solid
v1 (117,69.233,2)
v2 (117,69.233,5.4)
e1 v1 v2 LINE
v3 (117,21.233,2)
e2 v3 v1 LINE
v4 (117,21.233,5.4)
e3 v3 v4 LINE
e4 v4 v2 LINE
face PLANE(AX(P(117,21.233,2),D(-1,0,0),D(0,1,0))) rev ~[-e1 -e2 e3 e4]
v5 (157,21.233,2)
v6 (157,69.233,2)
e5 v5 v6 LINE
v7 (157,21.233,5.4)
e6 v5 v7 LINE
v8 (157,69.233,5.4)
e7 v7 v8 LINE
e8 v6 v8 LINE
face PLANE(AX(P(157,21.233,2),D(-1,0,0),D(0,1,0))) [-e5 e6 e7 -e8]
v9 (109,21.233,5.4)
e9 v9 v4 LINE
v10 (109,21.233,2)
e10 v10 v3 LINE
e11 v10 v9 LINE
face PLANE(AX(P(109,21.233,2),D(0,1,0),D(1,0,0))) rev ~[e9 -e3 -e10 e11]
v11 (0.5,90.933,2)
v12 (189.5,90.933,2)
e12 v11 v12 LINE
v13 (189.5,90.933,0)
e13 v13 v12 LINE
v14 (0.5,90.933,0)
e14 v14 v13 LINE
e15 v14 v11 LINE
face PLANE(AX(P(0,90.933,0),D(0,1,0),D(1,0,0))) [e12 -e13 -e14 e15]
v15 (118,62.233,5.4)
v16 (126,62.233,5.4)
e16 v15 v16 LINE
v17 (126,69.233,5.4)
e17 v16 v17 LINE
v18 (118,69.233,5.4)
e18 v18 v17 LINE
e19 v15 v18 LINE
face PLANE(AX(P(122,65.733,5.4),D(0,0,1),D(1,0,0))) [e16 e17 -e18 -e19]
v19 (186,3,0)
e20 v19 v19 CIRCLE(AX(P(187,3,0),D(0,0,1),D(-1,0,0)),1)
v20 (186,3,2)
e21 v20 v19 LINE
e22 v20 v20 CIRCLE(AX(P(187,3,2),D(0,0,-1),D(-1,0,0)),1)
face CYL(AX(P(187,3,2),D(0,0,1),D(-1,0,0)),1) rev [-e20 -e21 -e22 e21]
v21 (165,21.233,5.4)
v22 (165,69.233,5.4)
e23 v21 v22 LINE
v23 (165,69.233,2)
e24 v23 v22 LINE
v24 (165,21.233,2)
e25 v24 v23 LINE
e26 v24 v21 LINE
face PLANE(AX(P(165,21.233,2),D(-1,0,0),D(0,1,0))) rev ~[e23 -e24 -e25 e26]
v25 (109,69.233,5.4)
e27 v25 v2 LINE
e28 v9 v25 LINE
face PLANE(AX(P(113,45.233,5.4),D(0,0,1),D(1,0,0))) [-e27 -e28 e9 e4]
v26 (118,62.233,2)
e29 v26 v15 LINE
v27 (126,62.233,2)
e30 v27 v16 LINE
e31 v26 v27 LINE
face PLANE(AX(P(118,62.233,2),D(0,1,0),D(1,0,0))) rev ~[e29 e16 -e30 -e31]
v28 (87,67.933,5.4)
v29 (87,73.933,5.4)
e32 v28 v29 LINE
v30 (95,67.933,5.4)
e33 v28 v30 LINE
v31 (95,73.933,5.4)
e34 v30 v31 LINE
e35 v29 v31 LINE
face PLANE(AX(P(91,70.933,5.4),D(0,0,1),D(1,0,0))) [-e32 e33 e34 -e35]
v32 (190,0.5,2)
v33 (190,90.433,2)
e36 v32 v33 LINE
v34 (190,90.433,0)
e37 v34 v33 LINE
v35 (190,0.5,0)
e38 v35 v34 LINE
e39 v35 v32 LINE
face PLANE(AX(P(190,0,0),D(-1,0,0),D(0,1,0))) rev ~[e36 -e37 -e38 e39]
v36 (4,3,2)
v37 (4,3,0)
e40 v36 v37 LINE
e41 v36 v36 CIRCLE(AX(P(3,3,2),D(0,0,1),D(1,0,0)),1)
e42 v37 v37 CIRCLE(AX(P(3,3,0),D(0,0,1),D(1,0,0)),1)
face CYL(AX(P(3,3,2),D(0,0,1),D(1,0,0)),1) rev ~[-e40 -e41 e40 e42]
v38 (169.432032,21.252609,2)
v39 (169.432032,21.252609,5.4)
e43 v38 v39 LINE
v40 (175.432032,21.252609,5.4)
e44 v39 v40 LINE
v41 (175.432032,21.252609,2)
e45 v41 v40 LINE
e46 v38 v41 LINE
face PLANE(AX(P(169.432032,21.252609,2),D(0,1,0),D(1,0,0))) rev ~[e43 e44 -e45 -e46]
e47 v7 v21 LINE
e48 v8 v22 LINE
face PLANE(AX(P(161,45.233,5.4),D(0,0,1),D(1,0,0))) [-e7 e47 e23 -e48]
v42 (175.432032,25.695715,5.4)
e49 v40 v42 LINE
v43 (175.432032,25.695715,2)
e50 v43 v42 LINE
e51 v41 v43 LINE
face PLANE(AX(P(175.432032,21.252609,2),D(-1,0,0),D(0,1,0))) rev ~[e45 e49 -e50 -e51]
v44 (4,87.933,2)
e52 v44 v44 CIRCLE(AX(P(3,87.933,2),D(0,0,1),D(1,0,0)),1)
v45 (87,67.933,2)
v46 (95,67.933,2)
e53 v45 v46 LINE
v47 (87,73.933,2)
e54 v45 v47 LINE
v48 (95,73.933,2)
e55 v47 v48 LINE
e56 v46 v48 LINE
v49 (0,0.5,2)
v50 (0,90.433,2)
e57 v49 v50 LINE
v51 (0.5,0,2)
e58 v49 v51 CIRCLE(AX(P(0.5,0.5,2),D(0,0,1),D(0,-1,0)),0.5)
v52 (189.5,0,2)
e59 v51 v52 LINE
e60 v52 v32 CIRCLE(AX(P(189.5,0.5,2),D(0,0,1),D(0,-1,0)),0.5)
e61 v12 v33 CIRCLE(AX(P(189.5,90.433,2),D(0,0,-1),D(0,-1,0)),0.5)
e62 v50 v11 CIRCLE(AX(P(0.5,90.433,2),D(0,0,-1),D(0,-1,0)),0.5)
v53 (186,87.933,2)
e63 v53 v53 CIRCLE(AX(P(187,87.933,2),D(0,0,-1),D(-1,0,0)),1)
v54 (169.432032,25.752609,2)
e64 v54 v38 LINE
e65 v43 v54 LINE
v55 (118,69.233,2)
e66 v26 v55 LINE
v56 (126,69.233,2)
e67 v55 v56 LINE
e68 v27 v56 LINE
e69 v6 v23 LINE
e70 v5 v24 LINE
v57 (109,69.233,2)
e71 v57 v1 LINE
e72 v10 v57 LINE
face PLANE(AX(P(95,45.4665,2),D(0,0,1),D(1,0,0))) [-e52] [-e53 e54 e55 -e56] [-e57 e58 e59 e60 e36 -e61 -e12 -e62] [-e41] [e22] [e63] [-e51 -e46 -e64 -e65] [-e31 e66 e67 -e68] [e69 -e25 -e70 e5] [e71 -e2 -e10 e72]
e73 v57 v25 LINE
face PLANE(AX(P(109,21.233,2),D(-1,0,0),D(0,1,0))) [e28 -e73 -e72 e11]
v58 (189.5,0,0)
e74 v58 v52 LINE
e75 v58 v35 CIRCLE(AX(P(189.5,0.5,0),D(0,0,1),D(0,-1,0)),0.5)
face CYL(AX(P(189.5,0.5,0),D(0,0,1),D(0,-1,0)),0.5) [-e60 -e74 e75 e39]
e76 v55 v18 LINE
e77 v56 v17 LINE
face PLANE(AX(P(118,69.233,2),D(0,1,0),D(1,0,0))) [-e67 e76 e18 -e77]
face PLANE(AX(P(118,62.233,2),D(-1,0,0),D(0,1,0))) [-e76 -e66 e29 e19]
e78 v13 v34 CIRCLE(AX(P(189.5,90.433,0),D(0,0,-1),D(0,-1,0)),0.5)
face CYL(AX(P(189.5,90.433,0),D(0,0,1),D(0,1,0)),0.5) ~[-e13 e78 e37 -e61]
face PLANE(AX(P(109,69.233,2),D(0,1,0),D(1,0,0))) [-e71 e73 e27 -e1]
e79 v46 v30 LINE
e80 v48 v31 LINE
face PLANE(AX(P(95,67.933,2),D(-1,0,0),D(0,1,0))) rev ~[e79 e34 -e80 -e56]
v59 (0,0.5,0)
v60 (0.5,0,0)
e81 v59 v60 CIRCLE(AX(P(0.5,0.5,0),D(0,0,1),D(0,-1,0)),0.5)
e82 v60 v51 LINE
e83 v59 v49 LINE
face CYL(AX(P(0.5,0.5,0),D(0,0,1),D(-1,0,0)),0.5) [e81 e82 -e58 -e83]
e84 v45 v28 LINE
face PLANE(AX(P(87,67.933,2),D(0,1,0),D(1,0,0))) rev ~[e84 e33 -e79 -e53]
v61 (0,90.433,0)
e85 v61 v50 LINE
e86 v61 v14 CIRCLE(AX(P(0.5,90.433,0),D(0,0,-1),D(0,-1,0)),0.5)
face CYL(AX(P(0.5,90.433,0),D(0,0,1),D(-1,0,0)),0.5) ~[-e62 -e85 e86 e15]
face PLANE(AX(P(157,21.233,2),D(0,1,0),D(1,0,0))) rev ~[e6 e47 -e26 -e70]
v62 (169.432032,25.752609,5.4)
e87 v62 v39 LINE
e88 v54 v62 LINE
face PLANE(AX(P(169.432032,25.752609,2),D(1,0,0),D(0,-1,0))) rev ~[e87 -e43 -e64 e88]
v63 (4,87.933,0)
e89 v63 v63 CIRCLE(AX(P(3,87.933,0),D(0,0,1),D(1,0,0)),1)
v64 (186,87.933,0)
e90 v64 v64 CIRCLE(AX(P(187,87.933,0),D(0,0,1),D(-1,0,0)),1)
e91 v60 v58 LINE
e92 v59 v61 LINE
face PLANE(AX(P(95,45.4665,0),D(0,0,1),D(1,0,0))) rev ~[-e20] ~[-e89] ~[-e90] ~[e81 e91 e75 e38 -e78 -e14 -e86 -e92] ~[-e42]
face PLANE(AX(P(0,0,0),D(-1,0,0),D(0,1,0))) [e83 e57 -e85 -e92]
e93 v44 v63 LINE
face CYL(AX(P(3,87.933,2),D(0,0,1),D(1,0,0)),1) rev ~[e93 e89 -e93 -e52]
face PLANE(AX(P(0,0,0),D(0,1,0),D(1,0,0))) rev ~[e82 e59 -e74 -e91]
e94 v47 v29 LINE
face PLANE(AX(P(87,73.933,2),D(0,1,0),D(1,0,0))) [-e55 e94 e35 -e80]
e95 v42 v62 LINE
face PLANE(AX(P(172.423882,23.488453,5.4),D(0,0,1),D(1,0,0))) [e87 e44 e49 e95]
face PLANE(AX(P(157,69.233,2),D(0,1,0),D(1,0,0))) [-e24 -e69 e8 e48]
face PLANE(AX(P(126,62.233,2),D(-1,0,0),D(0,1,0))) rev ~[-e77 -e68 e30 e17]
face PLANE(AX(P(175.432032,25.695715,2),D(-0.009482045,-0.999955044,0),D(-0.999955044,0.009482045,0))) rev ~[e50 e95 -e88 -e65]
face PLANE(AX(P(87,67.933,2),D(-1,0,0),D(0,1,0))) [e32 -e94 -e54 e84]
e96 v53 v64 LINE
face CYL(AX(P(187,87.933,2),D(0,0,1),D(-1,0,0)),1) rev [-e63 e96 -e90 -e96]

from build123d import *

# Parameters (mm, degrees)
F0_W      = 190
F0_H      = 90.933
F1_DEPTH  = 2
F2_R      = 1
F3_DEPTH  = 2.001
F6_R      = 0.5
F7_W      = 8
F7_H      = 48
F7_H_2    = 7
F8_DEPTH  = 3.4
F9_W      = 8
F9_H      = 6
F10_DEPTH = 3.4


# Not quite as in the source:
# - a feature names something its author has since deleted; it is built from what else it names


with BuildPart() as f1:
    # F0 (on Top) → F1 (new body)
    with BuildSketch(Plane.XY):
        with Locations((95, 45.4665)):
            Rectangle(F0_W, F0_H)
    extrude(amount=F1_DEPTH)

    # F2 (on face) → F3 (cut, through all)
    with BuildSketch(Plane.XY.offset(2)):
        with Locations((3, 87.933)):
            Circle(F2_R)
        with Locations((3, 3)):
            Circle(F2_R)
    f3 = extrude(amount=-F3_DEPTH, mode=Mode.SUBTRACT)

    # F5: F3 across plane
    add(f3.mirror(Plane(origin=(95, 45.4665, 1), x_dir=(0, -1, 0), z_dir=(-1, 0, 0))), mode=Mode.SUBTRACT)

    # F6
    f6_edges = [f1.edges().sort_by_distance(p)[0] for p in [
        (190, 0, 1),
        (190, 90.933, 1),
        (0, 90.933, 1),
        (0, 0, 1),
    ]]
    fillet(f6_edges, radius=F6_R)

    # F7 (on face) → F8 (join)
    with BuildSketch(Plane.XY.offset(2)):
        with Locations((113, 45.233)):
            Rectangle(F7_W, F7_H)
        with Locations((161, 45.233)):
            Rectangle(F7_W, F7_H)
        with Locations((122, 65.733)):
            Rectangle(F7_W, F7_H_2)
        Polygon((169.4320317507, 25.7526094498), (169.4320317507, 21.2526094498), (175.4320317507, 21.2526094498), (175.4320317507, 25.6957146213), align=None)
    extrude(amount=F8_DEPTH)

    # F9 (on face) → F10 (join)
    with BuildSketch(Plane.XY.offset(2)):
        with Locations((91, 70.933)):
            Rectangle(F9_W, F9_H)
    extrude(amount=F10_DEPTH)


solid = f1.part
